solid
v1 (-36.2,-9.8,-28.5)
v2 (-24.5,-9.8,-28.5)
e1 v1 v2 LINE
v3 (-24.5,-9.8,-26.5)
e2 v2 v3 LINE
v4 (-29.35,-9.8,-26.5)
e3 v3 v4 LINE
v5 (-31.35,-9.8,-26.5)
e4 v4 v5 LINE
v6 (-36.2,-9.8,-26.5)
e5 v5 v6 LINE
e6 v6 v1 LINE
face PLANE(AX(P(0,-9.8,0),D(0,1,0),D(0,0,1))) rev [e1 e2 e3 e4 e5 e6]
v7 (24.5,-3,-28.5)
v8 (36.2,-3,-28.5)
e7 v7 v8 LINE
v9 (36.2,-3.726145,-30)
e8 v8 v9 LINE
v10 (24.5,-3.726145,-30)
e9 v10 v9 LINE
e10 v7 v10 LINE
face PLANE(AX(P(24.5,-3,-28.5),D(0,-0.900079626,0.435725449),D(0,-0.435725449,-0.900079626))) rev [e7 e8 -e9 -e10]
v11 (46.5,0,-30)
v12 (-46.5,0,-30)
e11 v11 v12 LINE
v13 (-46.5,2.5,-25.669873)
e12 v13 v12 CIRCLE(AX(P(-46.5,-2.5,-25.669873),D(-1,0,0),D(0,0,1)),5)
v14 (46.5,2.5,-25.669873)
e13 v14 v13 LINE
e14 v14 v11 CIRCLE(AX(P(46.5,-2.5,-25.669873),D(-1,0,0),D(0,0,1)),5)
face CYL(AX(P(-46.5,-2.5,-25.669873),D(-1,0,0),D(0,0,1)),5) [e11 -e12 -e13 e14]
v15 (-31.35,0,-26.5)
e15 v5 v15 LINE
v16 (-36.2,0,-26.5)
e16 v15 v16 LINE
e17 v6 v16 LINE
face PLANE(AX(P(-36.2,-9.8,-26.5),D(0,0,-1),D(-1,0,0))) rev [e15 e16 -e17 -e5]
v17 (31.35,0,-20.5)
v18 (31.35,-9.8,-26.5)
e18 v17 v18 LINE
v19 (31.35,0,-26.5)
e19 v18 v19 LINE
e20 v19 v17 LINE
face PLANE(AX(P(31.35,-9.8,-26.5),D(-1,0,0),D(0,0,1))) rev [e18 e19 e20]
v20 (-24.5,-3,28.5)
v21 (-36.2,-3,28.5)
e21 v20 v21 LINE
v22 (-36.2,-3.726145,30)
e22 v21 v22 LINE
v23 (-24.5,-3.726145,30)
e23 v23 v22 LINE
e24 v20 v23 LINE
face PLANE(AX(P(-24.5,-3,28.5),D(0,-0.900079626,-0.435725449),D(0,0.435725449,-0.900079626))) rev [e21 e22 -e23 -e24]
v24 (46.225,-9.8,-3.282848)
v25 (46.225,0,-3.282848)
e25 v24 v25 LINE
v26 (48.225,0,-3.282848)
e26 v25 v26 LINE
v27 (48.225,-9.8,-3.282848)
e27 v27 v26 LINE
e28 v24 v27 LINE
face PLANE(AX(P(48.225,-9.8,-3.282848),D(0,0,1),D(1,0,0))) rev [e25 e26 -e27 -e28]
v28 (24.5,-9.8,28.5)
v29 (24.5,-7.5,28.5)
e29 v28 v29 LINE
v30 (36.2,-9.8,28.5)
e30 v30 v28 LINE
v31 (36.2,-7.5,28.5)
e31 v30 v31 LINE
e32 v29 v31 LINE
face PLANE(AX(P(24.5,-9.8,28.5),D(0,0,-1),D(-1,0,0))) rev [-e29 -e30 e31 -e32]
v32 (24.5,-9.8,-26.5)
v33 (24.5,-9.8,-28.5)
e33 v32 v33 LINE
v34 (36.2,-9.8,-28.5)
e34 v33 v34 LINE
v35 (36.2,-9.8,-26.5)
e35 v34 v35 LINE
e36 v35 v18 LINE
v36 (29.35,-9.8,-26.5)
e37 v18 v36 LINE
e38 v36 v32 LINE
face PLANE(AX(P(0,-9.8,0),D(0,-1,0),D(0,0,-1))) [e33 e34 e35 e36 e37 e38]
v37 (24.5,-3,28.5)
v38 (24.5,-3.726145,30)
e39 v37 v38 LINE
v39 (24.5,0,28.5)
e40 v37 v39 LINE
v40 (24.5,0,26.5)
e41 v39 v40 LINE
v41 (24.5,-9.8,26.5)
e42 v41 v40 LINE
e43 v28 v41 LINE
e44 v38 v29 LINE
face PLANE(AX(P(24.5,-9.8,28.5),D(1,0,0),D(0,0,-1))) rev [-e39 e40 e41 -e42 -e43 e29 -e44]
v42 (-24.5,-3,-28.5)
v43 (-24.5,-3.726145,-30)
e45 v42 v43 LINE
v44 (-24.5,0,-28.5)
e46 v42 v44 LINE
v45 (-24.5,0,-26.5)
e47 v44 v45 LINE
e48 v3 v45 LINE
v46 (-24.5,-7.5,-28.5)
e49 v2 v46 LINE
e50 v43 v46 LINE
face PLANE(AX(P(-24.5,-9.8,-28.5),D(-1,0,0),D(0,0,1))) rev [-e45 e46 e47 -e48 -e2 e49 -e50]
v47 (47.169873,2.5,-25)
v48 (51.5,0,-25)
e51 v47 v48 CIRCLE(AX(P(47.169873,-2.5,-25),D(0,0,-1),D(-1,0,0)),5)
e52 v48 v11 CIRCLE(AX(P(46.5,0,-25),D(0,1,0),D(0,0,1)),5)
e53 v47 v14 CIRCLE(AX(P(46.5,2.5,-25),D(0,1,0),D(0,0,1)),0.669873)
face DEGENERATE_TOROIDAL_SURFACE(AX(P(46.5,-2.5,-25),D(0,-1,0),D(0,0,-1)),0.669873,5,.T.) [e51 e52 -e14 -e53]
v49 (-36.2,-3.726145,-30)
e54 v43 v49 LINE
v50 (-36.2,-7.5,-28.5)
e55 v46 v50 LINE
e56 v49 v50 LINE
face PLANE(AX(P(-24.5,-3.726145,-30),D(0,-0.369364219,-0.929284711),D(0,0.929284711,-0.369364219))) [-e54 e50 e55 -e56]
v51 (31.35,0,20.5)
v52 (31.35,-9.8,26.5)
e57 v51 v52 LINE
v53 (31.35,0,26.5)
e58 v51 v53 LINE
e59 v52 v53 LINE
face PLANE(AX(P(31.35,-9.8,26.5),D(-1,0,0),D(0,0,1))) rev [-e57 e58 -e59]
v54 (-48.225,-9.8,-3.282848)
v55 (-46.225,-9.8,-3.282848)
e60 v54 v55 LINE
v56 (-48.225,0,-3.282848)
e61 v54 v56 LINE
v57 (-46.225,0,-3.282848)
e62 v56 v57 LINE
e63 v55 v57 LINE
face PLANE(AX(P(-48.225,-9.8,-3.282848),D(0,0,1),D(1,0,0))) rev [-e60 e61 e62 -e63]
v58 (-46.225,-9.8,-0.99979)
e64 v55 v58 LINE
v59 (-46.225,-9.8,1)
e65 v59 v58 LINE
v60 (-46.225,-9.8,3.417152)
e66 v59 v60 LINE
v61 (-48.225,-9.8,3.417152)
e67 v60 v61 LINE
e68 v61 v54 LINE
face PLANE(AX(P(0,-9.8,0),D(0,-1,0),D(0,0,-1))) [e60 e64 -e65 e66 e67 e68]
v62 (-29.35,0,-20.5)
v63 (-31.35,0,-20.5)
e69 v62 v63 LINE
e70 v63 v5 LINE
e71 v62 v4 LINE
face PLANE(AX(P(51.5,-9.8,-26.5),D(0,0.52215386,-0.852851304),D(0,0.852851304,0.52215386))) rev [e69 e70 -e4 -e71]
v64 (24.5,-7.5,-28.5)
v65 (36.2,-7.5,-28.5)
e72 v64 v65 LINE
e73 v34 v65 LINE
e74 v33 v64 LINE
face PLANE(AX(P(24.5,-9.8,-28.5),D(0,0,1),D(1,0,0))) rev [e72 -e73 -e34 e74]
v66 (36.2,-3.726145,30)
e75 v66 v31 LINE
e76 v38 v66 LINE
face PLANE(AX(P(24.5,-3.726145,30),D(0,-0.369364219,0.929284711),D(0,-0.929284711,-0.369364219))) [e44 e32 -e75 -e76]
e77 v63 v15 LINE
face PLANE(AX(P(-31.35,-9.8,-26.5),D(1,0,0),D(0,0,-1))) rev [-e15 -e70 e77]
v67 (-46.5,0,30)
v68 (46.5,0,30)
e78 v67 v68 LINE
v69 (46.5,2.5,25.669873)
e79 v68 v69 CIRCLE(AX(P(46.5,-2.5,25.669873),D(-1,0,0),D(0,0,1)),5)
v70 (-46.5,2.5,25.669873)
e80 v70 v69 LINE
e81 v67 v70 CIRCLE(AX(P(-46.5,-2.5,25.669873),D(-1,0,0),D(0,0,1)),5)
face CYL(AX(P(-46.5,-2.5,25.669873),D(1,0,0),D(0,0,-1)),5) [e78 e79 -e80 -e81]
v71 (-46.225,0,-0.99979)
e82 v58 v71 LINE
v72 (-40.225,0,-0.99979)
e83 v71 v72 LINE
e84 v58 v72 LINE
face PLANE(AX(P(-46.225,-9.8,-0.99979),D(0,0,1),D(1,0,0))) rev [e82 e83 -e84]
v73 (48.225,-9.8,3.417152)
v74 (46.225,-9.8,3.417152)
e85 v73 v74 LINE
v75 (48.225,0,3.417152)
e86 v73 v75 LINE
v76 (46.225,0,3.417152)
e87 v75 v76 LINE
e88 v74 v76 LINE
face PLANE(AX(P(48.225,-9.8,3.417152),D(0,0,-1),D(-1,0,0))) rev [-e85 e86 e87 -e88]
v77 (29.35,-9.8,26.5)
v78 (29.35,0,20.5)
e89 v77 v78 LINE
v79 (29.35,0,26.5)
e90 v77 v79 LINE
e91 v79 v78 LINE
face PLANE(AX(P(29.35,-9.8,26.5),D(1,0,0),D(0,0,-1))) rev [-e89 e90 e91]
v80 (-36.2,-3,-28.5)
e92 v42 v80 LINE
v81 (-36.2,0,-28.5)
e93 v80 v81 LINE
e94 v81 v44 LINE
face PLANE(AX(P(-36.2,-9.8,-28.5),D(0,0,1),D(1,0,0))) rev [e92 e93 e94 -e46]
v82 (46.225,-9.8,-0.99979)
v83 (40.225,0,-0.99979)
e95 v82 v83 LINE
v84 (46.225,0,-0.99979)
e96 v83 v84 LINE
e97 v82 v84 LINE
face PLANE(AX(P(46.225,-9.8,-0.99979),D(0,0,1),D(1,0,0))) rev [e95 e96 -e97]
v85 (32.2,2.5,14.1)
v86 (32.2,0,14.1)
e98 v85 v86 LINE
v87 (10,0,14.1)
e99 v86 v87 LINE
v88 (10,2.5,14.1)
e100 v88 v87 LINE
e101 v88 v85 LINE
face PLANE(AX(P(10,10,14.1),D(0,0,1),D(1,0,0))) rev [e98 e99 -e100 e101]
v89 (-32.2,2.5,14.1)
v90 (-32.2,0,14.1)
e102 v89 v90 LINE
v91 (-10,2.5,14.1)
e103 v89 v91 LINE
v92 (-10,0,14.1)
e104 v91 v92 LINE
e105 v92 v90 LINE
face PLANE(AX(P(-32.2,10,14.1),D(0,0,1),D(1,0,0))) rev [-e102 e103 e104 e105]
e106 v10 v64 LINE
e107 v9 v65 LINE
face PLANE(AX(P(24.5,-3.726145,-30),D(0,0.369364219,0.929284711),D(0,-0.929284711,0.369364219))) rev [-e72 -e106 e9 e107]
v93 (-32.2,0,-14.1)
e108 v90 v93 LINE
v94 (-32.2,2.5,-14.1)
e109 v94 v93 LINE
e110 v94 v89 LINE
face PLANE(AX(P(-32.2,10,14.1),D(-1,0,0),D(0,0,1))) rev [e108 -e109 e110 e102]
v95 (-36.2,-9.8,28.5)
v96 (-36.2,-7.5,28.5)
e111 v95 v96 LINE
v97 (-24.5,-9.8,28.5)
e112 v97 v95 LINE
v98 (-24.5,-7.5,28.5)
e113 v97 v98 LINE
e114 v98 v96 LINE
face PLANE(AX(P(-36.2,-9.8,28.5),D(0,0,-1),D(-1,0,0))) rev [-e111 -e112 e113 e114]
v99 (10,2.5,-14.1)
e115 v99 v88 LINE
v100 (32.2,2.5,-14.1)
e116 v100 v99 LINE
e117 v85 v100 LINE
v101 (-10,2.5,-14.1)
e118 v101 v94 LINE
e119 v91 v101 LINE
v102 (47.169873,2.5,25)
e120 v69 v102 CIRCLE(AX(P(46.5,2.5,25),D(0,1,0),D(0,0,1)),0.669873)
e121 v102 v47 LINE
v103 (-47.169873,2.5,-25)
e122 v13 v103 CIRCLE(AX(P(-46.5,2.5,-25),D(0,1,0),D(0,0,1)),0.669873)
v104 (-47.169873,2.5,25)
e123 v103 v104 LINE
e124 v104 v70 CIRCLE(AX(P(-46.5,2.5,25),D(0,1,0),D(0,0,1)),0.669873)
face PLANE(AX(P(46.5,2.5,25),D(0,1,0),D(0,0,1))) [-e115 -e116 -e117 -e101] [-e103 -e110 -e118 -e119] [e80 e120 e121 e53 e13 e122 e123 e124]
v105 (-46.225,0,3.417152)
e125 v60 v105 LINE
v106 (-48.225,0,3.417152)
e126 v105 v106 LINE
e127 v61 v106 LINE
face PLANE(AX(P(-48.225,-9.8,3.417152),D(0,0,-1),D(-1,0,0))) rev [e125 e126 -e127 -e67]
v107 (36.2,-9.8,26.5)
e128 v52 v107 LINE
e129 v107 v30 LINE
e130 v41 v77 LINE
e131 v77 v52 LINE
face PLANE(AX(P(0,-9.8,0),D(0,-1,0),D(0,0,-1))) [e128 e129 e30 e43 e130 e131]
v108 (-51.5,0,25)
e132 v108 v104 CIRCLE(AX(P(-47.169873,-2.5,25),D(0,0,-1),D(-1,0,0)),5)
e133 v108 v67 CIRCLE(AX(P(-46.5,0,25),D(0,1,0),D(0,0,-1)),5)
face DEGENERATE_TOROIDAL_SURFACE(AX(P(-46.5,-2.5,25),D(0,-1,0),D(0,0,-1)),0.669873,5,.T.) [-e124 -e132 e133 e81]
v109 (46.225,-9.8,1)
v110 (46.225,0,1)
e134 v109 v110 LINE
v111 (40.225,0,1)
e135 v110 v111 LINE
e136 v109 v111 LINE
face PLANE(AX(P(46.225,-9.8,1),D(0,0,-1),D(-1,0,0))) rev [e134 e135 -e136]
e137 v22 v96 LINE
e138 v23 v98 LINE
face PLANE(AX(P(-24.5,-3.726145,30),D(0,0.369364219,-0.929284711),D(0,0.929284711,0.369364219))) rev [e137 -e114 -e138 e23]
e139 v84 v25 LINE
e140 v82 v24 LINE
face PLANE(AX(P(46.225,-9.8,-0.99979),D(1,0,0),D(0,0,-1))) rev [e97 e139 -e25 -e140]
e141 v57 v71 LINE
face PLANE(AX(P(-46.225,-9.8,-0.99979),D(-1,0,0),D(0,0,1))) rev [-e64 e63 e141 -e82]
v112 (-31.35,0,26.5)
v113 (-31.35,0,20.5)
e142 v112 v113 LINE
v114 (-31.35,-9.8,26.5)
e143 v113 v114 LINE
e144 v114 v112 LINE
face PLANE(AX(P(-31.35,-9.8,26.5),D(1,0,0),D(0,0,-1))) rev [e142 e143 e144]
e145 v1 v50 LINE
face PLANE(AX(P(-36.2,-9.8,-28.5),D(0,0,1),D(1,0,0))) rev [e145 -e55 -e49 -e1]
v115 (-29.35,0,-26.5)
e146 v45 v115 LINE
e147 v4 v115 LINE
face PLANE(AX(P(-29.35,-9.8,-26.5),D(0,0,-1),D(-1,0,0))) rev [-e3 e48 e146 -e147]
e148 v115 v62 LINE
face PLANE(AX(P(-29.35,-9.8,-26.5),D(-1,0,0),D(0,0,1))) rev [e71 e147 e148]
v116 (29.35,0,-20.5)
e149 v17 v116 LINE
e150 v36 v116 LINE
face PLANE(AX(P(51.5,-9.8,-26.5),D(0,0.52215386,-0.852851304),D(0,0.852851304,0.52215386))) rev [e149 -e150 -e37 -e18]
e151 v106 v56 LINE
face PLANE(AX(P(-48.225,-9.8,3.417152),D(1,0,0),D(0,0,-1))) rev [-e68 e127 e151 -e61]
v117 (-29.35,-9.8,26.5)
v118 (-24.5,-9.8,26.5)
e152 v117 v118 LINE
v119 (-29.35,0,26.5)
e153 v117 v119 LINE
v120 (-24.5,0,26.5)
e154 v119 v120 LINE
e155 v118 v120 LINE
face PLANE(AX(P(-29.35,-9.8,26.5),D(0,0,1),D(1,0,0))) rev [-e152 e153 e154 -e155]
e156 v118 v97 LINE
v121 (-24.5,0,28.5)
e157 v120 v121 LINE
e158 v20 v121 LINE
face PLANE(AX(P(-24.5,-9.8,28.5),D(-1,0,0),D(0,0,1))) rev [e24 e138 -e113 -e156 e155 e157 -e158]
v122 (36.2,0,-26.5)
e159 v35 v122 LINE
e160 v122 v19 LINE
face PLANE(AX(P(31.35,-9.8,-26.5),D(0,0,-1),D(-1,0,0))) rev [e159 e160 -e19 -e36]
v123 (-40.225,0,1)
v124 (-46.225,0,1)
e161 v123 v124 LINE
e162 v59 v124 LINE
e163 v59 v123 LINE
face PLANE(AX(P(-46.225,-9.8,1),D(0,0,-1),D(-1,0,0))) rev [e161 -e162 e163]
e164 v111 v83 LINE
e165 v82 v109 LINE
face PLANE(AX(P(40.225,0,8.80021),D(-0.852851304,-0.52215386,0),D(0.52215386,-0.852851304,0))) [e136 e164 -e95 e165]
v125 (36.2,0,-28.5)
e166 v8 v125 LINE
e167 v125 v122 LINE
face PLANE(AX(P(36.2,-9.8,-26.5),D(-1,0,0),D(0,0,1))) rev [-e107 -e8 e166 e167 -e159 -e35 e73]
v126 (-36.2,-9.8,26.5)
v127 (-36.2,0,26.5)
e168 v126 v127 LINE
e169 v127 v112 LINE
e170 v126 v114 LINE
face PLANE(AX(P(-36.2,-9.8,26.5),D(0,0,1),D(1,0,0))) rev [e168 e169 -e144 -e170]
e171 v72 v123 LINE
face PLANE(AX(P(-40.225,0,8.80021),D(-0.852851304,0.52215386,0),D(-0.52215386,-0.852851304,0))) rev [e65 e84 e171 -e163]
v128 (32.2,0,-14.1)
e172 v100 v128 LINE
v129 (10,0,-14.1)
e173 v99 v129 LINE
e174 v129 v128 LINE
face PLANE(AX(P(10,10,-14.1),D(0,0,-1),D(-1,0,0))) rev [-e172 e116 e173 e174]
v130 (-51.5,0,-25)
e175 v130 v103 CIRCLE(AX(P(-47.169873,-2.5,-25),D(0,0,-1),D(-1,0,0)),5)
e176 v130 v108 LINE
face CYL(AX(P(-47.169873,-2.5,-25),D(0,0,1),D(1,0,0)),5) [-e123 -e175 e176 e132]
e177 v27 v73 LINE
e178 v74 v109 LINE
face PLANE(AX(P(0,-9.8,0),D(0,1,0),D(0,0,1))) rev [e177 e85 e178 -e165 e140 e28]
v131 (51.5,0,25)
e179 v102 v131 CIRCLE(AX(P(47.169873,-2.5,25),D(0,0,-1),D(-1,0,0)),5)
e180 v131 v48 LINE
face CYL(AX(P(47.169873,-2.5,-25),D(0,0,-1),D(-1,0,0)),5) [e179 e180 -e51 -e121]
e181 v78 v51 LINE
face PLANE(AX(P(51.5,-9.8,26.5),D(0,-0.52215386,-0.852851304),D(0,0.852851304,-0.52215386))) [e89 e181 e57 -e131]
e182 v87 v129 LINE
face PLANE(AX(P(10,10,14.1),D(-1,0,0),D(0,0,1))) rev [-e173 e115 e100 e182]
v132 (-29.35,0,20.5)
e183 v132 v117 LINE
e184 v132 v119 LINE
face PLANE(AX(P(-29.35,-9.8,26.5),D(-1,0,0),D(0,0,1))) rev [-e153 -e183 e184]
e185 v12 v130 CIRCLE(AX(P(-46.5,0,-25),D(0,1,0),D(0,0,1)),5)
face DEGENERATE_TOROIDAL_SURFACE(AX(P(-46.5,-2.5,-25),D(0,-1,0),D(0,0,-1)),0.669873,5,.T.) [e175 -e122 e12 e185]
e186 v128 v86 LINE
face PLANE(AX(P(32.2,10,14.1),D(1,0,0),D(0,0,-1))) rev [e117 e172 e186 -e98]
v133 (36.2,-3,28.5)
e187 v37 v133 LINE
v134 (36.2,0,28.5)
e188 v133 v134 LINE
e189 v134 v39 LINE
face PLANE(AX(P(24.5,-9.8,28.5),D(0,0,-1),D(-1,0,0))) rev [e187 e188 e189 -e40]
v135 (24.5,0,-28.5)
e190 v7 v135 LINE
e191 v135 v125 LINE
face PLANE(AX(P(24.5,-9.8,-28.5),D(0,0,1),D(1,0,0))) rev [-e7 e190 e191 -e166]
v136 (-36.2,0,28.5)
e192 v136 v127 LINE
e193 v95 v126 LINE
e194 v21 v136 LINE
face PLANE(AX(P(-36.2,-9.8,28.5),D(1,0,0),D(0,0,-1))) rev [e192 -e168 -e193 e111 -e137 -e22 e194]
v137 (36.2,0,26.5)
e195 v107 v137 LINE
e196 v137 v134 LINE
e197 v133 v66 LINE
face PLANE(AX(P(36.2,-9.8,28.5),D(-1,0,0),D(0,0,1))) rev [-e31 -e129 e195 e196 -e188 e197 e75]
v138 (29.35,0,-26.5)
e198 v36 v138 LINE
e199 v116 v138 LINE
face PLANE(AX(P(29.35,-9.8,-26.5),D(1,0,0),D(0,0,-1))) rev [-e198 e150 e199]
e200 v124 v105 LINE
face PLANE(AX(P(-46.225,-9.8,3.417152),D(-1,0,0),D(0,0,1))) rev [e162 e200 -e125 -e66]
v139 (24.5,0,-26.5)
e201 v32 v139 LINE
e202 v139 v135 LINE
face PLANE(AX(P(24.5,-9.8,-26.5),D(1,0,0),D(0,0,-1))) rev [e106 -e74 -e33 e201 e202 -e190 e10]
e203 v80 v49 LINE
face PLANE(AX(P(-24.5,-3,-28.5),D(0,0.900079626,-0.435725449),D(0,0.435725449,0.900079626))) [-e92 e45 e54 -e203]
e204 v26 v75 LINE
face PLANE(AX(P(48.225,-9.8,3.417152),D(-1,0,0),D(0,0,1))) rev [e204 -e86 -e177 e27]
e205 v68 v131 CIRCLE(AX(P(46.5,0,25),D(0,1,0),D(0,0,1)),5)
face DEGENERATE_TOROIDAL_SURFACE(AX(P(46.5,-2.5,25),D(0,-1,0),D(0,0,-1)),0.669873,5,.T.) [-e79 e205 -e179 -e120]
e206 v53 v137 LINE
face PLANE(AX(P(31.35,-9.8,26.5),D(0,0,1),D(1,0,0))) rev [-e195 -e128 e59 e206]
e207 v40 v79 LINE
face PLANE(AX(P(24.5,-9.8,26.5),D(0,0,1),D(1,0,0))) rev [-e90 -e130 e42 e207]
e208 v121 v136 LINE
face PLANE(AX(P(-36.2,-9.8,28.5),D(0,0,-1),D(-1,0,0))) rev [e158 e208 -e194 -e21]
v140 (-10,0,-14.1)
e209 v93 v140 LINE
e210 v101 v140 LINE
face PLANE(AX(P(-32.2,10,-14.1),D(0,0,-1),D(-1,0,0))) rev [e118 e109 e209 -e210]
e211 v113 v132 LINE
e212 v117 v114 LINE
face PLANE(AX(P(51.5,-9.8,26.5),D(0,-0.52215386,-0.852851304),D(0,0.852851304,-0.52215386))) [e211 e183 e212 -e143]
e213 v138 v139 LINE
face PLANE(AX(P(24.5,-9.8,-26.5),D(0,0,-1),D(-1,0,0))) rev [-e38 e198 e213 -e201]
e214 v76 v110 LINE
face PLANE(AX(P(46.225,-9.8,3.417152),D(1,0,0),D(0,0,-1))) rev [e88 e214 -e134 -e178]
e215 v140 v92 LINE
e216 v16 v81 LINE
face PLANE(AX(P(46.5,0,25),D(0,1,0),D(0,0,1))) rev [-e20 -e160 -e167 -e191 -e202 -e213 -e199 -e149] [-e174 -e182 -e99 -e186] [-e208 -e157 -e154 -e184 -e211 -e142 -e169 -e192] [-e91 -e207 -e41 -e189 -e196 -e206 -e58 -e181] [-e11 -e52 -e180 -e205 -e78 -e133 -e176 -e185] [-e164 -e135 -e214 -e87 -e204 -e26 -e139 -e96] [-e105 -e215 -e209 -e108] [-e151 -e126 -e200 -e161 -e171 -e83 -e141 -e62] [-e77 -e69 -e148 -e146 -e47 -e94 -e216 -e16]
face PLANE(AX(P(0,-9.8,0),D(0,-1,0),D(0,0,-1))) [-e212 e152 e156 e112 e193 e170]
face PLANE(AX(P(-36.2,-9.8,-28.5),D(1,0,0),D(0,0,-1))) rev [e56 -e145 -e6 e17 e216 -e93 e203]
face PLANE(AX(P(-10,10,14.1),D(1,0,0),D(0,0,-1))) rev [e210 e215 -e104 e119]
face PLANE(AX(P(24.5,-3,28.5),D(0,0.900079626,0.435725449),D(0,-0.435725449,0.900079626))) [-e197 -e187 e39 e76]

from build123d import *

# Parameters (mm, degrees)
BOSS_EXTRUDE1_DEPTH  = 2.5
FILLET1_R            = 5
BOSS_EXTRUDE2_DEPTH  = 9.8
CUT_EXTRUDE1_DEPTH   = 9.8
CUT_EXTRUDE2_DEPTH   = 89.657557489
BOSS_EXTRUDE3_DEPTH  = 11.7
MIRROR4_COPY_1_DEPTH = 11.7
SKETCH8_W            = 22.2
SKETCH8_H            = 28.2
CUT_EXTRUDE3_DEPTH   = 10


with BuildPart() as part:
    # Sketch1 → Boss-Extrude1 (new body)
    with BuildSketch(Plane(origin=(0, 0, 0), x_dir=(1, 0, 0), z_dir=(0, 1, 0))):
        with BuildLine():
            Line((-46.5, 30), (46.5, 30))
            ThreePointArc((46.5, 30), (50.035533906, 28.535533906), (51.5, 25))
            Line((51.5, 25), (51.5, -25))
            ThreePointArc((51.5, -25), (50.035533906, -28.535533906), (46.5, -30))
            Line((46.5, -30), (-46.5, -30))
            ThreePointArc((-46.5, -30), (-50.035533906, -28.535533906), (-51.5, -25))
            Line((-51.5, -25), (-51.5, 25))
            ThreePointArc((-51.5, 25), (-50.035533906, 28.535533906), (-46.5, 30))
        make_face()
    extrude(amount=BOSS_EXTRUDE1_DEPTH)

    # Fillet1
    # the kernel refuses this fillet: 5 mm, written as the material it takes off along each edge
    with BuildSketch(Plane(origin=(-46.5, 2.5, -25), x_dir=(-1, 0, 0), z_dir=(0, 0, 1))) as fillet1_piece_1:
        with BuildLine():
            CenterArc((0.669872981, 5), FILLET1_R, 270, 60)
            Line((0.669872981, 0), (0.669872981, -0.1))
            Line((0.669872981, -0.1), (5, -0.1))
            Line((5, -0.1), (5.1, 0))
            ThreePointArc((5.1, 0), (5.1, 1.25), (5.08660254, 2.45))
            Line((5.08660254, 2.45), (5, 2.5))
        make_face()
    revolve(axis=Axis((-46.5, 2.5, -25), (0, -1, 0)), revolution_arc=90, mode=Mode.SUBTRACT)
    with BuildSketch(Plane(origin=(-46.5, 2.5, -30), x_dir=(0, -1, 0), z_dir=(1, 0, 0)), Plane(origin=(46.5, 2.5, 30), x_dir=(0, -1, 0), z_dir=(-1, 0, 0))) as fillet1_piece_2:
        with BuildLine():
            CenterArc((5, -4.330127019), FILLET1_R, 120, 60)
            Line((0, -4.330127019), (-0.1, -4.330127019))
            Line((-0.1, -4.330127019), (-0.1, 0))
            Line((-0.1, 0), (0, 0.1))
            ThreePointArc((0, 0.1), (1.25, 0.1), (2.45, 0.08660254))
            Line((2.45, 0.08660254), (2.5, 0))
        make_face()
    extrude(amount=93, mode=Mode.SUBTRACT)
    with BuildSketch(Plane(origin=(46.5, 2.5, -25), x_dir=(0, 0, -1), z_dir=(-1, 0, 0))) as fillet1_piece_3:
        with BuildLine():
            CenterArc((0.669872981, 5), FILLET1_R, 270, 60)
            Line((0.669872981, 0), (0.669872981, -0.1))
            Line((0.669872981, -0.1), (5, -0.1))
            Line((5, -0.1), (5.1, 0))
            ThreePointArc((5.1, 0), (5.1, 1.25), (5.08660254, 2.45))
            Line((5.08660254, 2.45), (5, 2.5))
        make_face()
    revolve(axis=Axis((46.5, 2.5, -25), (0, -1, 0)), revolution_arc=90, mode=Mode.SUBTRACT)
    with BuildSketch(Plane(origin=(51.5, 2.5, -25), x_dir=(0, -1, 0), z_dir=(0, 0, 1)), Plane(origin=(-51.5, 2.5, 25), x_dir=(0, -1, 0), z_dir=(0, 0, -1))) as fillet1_piece_4:
        with BuildLine():
            CenterArc((5, -4.330127019), FILLET1_R, 120, 60)
            Line((0, -4.330127019), (-0.1, -4.330127019))
            Line((-0.1, -4.330127019), (-0.1, 0))
            Line((-0.1, 0), (0, 0.1))
            ThreePointArc((0, 0.1), (1.25, 0.1), (2.45, 0.08660254))
            Line((2.45, 0.08660254), (2.5, 0))
        make_face()
    extrude(amount=50, mode=Mode.SUBTRACT)
    with BuildSketch(Plane(origin=(46.5, 2.5, 25), x_dir=(1, 0, 0), z_dir=(0, 0, -1))) as fillet1_piece_5:
        with BuildLine():
            CenterArc((0.669872981, 5), FILLET1_R, 270, 60)
            Line((0.669872981, 0), (0.669872981, -0.1))
            Line((0.669872981, -0.1), (5, -0.1))
            Line((5, -0.1), (5.1, 0))
            ThreePointArc((5.1, 0), (5.1, 1.25), (5.08660254, 2.45))
            Line((5.08660254, 2.45), (5, 2.5))
        make_face()
    revolve(axis=Axis((46.5, 2.5, 25), (0, -1, 0)), revolution_arc=90, mode=Mode.SUBTRACT)
    with BuildSketch(Plane(origin=(-46.5, 2.5, 25), x_dir=(0, 0, 1), z_dir=(1, 0, 0))) as fillet1_piece_6:
        with BuildLine():
            CenterArc((0.669872981, 5), FILLET1_R, 270, 60)
            Line((0.669872981, 0), (0.669872981, -0.1))
            Line((0.669872981, -0.1), (5, -0.1))
            Line((5, -0.1), (5.1, 0))
            ThreePointArc((5.1, 0), (5.1, 1.25), (5.08660254, 2.45))
            Line((5.08660254, 2.45), (5, 2.5))
        make_face()
    revolve(axis=Axis((-46.5, 2.5, 25), (0, -1, 0)), revolution_arc=90, mode=Mode.SUBTRACT)

    # Sketch2 → Boss-Extrude2 (add)
    with BuildSketch(Plane.XZ):
        Polygon((-36.2, 28.5), (-24.5, 28.5), (-24.5, 26.5), (-29.35, 26.5), (-29.35, 20.5), (-31.35, 20.5), (-31.35, 26.5), (-36.2, 26.5), align=None)
        Polygon((48.225, -3.282847821), (46.225, -3.282847821), (46.225, -0.999790058), (40.225, -0.999790058), (40.225, 1), (46.225, 1), (46.225, 3.417152179), (48.225, 3.417152179), align=None)
        Polygon((24.5, 28.5), (36.2, 28.5), (36.2, 26.5), (31.35, 26.5), (31.35, 20.5), (29.35, 20.5), (29.35, 26.5), (24.5, 26.5), align=None)
        Polygon((24.5, -26.5), (29.35, -26.5), (29.35, -20.5), (31.35, -20.5), (31.35, -26.5), (36.2, -26.5), (36.2, -28.5), (24.5, -28.5), align=None)
        Polygon((-36.2, -28.5), (-24.5, -28.5), (-24.5, -26.5), (-29.35, -26.5), (-29.35, -20.5), (-31.35, -20.5), (-31.35, -26.5), (-36.2, -26.5), align=None)
        Polygon((-48.225, 3.417152179), (-46.225, 3.417152179), (-46.225, 1), (-40.225, 1), (-40.225, -0.999790058), (-46.225, -0.999790058), (-46.225, -3.282847821), (-48.225, -3.282847821), align=None)
    extrude(amount=BOSS_EXTRUDE2_DEPTH)

    # Sketch4 → Cut-Extrude1 (cut)
    with BuildSketch(Plane(origin=(0, 0, -0.999790058), x_dir=(-1, 0, 0), z_dir=(0, 0, -1))):
        Polygon((40.225, 0), (46.225, -9.8), (40.225, -9.8), align=None)
    cut_extrude1 = extrude(amount=-CUT_EXTRUDE1_DEPTH, mode=Mode.SUBTRACT)

    # Mirror1: Cut-Extrude1 across plane
    add(cut_extrude1.mirror(Plane(origin=(0, 0, 0), x_dir=(0, 0, 1), z_dir=(1, 0, 0))), mode=Mode.SUBTRACT)

    # Sketch5 → Cut-Extrude2 (cut, through all)
    with BuildSketch(Plane.ZY.offset(31.35)):
        Polygon((-26.5, -9.8), (-20.5, 0), (-20.5, -9.8), align=None)
    cut_extrude2 = extrude(amount=-CUT_EXTRUDE2_DEPTH, mode=Mode.SUBTRACT)

    # Mirror2: Cut-Extrude2 across plane
    add(cut_extrude2.mirror(Plane.XY), mode=Mode.SUBTRACT)

    # Sketch6 → Boss-Extrude3 (add)
    with BuildSketch(Plane(origin=(36.2, 0, 0), x_dir=(0, 0, -1), z_dir=(1, 0, 0))):
        Polygon((-28.5, -3), (-28.5, -7.5), (-30, -3.726144837), align=None)
    boss_extrude3 = extrude(amount=-BOSS_EXTRUDE3_DEPTH)

    # Mirror3: Boss-Extrude3 across plane
    add(boss_extrude3.mirror(Plane(origin=(0, 0, 0), x_dir=(0, 0, 1), z_dir=(1, 0, 0))))

    # Mirror4: Boss-Extrude3 across plane
    add(boss_extrude3.mirror(Plane.XY))

    # Mirror4 copy 1 sketch → Mirror4 copy 1 (add)
    with BuildSketch(Plane.ZY.offset(36.2)):
        Polygon((-28.5, -3), (-28.5, -7.5), (-30, -3.726144837), align=None)
    extrude(amount=-MIRROR4_COPY_1_DEPTH)

    # Sketch8 → Cut-Extrude3 (cut)
    with BuildSketch(Plane.XZ):
        with Locations((-21.1, 0)):
            Rectangle(SKETCH8_W, SKETCH8_H)
        with Locations((21.1, 0)):
            Rectangle(SKETCH8_W, SKETCH8_H)
    extrude(amount=-CUT_EXTRUDE3_DEPTH, mode=Mode.SUBTRACT)


solid = part.part
